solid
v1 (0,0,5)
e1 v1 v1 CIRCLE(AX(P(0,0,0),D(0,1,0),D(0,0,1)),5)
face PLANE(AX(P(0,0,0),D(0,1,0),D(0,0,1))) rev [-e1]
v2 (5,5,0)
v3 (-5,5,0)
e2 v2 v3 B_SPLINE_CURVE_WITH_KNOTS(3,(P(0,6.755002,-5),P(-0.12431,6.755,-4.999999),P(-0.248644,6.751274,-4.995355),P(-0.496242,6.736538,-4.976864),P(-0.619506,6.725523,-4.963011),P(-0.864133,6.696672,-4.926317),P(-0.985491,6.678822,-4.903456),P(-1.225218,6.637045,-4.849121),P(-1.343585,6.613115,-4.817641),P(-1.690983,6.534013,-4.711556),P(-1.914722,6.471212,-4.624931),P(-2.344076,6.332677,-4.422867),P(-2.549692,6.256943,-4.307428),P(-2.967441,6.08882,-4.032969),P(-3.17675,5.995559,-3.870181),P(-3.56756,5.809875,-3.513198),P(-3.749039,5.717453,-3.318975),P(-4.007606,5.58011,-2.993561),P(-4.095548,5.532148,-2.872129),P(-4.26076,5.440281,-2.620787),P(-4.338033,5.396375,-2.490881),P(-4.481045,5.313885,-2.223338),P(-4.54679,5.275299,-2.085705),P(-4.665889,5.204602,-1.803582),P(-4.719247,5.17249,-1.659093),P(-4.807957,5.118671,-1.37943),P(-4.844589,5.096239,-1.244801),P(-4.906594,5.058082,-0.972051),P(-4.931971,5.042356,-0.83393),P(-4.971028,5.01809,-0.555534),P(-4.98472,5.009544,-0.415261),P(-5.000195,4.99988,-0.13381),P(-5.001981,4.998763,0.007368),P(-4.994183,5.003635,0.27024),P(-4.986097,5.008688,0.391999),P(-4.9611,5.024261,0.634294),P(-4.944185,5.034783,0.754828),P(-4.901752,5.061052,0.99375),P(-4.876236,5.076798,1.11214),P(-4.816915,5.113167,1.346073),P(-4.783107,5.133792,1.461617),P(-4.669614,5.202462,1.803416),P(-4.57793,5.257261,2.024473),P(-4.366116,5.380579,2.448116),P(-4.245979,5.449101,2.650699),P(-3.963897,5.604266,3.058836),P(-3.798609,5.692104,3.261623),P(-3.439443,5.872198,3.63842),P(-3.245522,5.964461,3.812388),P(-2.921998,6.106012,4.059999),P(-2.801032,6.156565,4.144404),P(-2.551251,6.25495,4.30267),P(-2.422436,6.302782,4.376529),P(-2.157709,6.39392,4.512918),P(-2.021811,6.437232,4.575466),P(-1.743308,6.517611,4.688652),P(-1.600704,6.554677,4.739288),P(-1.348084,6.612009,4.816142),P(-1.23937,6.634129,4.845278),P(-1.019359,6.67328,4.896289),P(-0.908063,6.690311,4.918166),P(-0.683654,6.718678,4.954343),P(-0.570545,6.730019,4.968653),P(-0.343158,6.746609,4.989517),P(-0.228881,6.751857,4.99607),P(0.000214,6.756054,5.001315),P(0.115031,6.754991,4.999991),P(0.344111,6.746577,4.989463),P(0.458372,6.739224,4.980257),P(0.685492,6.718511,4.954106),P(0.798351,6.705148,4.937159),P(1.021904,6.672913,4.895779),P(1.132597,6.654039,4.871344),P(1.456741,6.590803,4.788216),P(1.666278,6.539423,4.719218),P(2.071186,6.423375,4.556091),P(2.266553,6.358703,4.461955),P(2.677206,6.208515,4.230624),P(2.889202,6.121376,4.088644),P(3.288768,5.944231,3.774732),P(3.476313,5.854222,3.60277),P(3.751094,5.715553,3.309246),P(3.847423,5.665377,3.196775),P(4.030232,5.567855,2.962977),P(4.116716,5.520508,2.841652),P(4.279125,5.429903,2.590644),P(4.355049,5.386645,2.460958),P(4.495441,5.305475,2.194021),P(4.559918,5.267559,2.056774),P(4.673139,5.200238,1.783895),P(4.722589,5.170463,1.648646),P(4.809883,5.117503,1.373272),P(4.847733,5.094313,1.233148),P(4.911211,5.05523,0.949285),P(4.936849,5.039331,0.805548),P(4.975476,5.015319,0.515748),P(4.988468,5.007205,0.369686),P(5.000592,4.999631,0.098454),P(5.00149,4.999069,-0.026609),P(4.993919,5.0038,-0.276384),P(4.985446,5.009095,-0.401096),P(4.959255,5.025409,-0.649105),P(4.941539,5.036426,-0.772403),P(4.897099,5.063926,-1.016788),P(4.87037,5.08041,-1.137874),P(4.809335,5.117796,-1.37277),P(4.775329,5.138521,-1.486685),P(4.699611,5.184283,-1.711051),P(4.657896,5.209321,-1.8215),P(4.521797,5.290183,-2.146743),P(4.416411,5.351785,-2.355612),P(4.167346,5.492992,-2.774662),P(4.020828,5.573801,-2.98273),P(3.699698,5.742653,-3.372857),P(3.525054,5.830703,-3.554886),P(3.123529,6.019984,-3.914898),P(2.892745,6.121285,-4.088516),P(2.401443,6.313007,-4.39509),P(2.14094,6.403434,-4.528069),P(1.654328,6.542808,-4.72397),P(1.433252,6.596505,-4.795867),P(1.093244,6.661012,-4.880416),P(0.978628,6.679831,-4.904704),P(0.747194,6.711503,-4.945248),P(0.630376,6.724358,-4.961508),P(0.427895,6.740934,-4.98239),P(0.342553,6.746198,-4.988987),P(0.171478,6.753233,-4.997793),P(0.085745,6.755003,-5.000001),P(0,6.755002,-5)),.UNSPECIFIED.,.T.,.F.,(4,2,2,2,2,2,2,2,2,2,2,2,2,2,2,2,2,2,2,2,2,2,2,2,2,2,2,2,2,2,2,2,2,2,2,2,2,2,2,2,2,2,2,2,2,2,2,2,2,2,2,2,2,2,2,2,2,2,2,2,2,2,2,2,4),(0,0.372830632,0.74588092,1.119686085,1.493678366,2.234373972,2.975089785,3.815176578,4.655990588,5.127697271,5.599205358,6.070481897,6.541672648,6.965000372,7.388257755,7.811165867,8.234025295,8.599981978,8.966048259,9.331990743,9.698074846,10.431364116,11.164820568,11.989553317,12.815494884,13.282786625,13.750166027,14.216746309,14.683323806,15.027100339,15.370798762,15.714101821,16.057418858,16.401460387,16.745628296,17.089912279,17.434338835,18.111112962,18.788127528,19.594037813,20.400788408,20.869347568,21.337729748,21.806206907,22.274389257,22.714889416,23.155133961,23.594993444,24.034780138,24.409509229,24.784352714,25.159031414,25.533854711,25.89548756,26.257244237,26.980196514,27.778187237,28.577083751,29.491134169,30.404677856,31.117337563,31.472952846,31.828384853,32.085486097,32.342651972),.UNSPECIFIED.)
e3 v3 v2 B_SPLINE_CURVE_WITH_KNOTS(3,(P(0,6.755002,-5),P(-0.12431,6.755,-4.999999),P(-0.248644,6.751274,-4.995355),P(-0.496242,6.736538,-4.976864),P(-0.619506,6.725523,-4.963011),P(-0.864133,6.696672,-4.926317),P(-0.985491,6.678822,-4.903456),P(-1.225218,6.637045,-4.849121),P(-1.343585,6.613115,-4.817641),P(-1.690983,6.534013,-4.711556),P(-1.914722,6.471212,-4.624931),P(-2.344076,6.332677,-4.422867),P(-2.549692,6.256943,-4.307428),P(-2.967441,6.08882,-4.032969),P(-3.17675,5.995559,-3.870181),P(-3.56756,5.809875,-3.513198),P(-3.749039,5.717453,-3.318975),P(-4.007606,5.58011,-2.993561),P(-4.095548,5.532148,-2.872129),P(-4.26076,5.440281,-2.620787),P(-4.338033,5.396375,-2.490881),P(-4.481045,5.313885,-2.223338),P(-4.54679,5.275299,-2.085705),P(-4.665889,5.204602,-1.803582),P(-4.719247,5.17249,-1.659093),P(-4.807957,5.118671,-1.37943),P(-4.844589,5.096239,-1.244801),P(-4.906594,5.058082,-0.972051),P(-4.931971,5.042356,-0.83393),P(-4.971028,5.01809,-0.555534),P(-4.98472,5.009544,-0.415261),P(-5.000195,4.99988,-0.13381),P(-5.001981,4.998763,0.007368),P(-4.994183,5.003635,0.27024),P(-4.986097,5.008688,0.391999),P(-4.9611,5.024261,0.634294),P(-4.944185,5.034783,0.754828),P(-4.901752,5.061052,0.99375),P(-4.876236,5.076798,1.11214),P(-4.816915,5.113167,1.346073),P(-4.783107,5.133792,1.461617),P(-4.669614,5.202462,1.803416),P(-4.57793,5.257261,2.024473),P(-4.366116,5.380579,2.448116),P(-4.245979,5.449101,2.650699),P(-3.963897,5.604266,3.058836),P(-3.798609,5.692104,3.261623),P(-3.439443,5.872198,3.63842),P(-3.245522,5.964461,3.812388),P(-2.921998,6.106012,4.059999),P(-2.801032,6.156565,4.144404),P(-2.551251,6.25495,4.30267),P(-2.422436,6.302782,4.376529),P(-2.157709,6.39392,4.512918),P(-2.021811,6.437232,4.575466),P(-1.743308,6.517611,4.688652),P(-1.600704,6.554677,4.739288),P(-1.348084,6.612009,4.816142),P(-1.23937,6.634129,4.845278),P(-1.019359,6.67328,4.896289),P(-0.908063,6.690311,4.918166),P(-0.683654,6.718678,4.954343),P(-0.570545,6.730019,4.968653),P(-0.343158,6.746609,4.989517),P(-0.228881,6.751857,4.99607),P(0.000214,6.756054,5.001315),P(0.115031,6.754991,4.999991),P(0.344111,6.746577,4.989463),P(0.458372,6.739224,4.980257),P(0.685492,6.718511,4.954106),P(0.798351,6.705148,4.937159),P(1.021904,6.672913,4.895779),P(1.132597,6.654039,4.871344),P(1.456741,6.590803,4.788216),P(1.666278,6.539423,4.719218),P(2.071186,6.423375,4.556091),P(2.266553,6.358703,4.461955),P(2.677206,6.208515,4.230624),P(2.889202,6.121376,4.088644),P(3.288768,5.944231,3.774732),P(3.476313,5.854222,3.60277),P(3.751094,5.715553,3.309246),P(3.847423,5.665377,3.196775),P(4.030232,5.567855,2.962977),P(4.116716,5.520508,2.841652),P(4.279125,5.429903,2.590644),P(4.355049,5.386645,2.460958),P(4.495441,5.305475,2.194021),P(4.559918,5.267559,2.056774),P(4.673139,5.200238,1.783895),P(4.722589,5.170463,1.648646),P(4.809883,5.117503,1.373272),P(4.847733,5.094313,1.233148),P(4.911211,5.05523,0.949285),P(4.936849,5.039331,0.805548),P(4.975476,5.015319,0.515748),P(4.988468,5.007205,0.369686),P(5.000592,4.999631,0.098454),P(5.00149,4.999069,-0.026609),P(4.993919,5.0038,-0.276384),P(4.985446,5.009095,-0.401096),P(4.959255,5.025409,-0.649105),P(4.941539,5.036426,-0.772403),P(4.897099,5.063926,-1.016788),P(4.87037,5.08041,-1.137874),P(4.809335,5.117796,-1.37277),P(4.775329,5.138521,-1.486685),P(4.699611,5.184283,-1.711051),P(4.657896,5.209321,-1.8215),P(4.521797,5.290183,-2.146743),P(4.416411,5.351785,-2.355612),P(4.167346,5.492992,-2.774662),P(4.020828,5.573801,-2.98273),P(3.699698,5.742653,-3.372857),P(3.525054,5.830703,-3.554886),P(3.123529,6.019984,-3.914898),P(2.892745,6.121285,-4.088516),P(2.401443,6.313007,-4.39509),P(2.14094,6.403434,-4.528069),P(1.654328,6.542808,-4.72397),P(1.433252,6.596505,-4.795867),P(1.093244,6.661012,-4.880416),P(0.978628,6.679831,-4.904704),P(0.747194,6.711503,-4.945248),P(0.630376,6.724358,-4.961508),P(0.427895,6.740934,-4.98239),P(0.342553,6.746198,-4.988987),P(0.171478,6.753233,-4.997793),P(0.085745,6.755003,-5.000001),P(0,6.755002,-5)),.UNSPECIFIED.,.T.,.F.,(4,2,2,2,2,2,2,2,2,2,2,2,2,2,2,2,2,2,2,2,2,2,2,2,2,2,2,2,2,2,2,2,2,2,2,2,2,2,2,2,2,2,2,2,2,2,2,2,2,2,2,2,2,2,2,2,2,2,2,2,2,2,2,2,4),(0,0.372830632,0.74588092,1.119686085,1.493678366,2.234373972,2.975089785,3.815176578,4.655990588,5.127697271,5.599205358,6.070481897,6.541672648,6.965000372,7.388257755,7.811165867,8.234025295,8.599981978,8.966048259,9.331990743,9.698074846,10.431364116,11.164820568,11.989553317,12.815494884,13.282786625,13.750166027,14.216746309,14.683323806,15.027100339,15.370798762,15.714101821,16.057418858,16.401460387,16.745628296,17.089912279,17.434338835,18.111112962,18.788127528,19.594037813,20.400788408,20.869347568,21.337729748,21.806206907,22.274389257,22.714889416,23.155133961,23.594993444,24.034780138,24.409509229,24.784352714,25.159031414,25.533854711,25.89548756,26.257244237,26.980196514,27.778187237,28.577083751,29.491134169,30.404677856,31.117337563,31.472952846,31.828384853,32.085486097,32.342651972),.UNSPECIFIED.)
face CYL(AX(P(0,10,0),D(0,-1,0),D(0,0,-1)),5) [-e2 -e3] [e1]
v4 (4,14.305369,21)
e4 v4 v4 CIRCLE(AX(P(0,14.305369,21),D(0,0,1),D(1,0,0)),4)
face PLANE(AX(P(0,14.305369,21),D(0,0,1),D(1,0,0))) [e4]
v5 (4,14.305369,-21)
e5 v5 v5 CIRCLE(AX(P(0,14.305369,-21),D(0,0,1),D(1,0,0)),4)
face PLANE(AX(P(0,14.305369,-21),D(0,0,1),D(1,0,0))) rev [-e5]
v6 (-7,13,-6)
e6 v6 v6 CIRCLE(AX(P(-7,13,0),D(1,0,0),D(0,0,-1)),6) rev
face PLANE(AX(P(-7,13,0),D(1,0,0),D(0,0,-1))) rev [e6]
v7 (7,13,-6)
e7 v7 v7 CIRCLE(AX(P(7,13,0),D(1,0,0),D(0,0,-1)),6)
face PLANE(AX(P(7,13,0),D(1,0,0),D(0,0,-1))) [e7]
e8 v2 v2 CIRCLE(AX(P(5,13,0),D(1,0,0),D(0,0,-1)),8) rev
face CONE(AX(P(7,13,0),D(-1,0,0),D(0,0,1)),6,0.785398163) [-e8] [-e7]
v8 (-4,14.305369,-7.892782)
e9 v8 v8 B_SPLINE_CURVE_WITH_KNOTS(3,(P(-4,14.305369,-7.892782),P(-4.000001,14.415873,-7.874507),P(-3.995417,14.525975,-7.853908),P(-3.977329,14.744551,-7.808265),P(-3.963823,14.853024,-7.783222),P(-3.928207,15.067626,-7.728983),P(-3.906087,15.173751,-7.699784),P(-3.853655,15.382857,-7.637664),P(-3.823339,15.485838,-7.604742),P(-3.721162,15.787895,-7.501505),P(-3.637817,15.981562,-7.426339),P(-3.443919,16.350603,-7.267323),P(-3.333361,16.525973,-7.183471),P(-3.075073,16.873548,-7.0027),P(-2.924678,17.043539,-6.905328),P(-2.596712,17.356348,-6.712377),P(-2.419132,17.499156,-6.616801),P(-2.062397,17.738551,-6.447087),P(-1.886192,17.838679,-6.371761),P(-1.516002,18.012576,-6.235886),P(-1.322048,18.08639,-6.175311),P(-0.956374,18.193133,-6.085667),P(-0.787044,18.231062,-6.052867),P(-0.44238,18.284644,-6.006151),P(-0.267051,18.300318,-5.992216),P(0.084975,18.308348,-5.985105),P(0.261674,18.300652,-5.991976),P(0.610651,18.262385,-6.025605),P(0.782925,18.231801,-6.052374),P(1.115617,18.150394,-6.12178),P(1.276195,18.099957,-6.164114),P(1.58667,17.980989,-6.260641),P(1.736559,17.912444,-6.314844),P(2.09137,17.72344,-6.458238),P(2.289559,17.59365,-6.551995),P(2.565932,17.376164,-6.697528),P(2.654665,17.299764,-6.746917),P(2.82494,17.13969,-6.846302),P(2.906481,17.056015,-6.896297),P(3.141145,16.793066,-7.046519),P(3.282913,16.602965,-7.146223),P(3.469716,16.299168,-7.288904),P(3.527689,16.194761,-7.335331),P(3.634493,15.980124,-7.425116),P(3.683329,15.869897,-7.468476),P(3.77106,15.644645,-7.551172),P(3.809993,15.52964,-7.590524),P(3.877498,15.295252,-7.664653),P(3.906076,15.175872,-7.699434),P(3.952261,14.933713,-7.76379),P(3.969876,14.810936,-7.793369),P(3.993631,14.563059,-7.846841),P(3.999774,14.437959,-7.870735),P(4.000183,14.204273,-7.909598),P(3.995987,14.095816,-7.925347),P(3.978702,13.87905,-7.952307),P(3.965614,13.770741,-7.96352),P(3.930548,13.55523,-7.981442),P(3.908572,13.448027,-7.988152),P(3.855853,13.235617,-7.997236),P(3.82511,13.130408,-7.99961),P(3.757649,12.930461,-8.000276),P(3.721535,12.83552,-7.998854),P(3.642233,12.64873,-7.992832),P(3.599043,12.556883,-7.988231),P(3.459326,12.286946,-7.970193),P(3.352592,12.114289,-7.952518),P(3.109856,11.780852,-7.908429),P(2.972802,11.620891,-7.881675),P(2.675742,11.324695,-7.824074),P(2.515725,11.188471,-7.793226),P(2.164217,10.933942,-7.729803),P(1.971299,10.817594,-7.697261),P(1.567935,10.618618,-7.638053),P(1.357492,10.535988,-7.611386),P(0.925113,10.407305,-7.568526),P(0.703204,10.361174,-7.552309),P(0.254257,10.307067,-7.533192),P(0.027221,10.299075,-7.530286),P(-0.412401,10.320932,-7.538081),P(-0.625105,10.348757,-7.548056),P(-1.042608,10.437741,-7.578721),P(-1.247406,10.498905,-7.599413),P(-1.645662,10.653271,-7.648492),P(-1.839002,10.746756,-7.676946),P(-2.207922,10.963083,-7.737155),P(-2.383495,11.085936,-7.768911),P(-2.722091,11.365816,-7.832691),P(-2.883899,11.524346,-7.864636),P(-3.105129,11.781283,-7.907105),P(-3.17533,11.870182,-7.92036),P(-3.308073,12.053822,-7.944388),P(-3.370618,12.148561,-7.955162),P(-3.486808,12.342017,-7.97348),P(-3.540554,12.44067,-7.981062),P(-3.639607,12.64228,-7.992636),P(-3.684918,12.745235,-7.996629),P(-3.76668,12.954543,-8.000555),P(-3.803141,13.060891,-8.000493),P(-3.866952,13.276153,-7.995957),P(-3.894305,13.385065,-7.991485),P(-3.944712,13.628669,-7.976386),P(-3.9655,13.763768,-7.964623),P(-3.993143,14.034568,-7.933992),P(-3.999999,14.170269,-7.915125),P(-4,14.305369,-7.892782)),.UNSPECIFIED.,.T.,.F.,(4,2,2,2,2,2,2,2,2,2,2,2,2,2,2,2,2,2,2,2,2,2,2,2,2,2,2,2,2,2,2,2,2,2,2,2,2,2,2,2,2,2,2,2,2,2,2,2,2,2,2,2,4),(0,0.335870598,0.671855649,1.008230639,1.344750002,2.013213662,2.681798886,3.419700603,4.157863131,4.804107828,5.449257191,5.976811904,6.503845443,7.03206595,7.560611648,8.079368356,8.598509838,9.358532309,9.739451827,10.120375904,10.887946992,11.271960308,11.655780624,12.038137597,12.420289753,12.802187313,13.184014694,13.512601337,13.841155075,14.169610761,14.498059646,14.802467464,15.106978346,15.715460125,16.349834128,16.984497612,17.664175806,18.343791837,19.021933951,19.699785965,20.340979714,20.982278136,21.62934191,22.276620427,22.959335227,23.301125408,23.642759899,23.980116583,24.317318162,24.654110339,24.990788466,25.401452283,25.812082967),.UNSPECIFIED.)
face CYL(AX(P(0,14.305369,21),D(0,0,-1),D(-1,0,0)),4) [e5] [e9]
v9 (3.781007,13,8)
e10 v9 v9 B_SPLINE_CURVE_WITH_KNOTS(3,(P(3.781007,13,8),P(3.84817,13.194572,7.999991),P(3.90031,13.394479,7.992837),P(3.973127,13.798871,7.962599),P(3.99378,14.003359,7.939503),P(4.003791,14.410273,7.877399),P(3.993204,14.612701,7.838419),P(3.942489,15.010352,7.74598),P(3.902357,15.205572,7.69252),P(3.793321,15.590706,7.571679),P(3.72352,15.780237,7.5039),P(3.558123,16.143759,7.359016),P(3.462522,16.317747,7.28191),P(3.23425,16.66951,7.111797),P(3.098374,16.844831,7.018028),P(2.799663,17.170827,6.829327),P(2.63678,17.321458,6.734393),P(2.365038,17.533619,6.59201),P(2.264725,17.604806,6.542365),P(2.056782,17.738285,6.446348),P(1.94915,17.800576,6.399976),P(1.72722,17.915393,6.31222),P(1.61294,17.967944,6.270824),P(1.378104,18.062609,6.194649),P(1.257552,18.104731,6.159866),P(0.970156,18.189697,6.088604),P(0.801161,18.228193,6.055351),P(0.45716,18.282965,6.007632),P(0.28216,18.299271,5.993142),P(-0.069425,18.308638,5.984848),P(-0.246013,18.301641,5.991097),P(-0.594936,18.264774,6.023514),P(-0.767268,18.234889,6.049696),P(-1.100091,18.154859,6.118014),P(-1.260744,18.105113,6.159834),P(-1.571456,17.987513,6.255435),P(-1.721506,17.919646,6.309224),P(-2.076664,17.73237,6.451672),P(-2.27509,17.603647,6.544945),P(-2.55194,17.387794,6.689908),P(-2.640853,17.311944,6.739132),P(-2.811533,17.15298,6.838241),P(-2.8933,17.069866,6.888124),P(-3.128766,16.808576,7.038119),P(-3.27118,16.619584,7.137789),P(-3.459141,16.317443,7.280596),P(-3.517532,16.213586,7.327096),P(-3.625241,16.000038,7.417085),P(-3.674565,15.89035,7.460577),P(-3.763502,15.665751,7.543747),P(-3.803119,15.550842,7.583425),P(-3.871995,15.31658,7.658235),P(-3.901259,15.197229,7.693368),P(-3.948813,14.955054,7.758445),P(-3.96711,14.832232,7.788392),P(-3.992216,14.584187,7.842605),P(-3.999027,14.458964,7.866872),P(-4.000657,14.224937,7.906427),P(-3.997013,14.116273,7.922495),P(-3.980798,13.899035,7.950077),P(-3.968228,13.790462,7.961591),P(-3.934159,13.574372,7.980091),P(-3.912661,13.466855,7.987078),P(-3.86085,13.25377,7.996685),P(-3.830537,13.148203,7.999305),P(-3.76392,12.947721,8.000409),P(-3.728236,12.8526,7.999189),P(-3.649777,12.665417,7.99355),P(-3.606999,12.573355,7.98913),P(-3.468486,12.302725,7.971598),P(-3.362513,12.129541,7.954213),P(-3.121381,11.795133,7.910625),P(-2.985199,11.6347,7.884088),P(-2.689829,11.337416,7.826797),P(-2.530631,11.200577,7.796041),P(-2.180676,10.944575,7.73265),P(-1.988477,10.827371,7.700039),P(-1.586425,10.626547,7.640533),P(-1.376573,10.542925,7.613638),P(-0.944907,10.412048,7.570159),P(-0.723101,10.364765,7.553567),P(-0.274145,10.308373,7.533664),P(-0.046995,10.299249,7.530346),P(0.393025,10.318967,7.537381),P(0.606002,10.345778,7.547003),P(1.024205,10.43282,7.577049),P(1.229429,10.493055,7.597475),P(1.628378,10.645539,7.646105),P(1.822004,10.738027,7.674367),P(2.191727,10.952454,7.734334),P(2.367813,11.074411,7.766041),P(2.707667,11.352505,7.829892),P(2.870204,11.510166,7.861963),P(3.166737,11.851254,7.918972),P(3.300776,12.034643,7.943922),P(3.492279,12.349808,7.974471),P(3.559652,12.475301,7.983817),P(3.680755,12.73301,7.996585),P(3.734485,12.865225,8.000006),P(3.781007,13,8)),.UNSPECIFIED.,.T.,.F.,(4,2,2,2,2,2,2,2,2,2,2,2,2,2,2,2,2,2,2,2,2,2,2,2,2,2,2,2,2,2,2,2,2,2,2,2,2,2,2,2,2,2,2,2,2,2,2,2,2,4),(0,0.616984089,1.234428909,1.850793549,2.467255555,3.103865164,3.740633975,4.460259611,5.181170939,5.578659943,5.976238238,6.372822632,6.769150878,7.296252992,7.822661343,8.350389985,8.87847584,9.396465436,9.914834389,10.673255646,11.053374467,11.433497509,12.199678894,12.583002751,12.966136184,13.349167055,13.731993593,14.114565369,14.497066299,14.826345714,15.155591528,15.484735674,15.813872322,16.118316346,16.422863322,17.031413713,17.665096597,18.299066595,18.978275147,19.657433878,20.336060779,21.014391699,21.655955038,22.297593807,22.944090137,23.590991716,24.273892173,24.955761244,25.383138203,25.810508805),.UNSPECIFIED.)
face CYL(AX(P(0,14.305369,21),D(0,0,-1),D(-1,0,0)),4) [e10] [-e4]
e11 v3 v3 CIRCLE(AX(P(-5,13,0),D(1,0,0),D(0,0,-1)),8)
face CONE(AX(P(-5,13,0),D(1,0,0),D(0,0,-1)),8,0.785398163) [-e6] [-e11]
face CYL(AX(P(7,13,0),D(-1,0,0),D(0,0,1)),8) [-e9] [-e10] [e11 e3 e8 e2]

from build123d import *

# Parameters (mm, degrees)
SKETCH1_R           = 5
BOSS_EXTRUDE1_DEPTH = 10
SKETCH2_R           = 8
BOSS_EXTRUDE2_DEPTH = 7
SKETCH3_R           = 4
BOSS_EXTRUDE3_DEPTH = 21
CHAMFER1_SIZE       = 2


with BuildPart() as part:
    # Sketch1 → Boss-Extrude1 (new body)
    with BuildSketch(Plane(origin=(0, 0, 0), x_dir=(1, 0, 0), z_dir=(0, 1, 0))):
        with Locations(Location((0, 0, 0), (0, 0, 270))):
            Circle(SKETCH1_R)
    extrude(amount=BOSS_EXTRUDE1_DEPTH)

    # Sketch2 → Boss-Extrude2 (add, symmetric)
    with BuildSketch(Plane(origin=(0, 0, 0), x_dir=(0, 0, -1), z_dir=(1, 0, 0))):
        with Locations((0, 13)):
            Circle(SKETCH2_R)
    extrude(amount=BOSS_EXTRUDE2_DEPTH, both=True)

    # Sketch3 → Boss-Extrude3 (add, symmetric)
    with BuildSketch(Plane.XY):
        with Locations(Location((0, 14.305369128, 0), (0, 0, 180))):
            Circle(SKETCH3_R)
    extrude(amount=BOSS_EXTRUDE3_DEPTH, both=True)

    # Chamfer1
    chamfer1_edges = [part.edges().sort_by_distance(p)[0] for p in [
        (-7, 13, 8),
        (7, 13, 8),
    ]]
    chamfer(chamfer1_edges, length=CHAMFER1_SIZE - 0.0001)  # a hair under: the kernel refuses the full size


solid = part.part
